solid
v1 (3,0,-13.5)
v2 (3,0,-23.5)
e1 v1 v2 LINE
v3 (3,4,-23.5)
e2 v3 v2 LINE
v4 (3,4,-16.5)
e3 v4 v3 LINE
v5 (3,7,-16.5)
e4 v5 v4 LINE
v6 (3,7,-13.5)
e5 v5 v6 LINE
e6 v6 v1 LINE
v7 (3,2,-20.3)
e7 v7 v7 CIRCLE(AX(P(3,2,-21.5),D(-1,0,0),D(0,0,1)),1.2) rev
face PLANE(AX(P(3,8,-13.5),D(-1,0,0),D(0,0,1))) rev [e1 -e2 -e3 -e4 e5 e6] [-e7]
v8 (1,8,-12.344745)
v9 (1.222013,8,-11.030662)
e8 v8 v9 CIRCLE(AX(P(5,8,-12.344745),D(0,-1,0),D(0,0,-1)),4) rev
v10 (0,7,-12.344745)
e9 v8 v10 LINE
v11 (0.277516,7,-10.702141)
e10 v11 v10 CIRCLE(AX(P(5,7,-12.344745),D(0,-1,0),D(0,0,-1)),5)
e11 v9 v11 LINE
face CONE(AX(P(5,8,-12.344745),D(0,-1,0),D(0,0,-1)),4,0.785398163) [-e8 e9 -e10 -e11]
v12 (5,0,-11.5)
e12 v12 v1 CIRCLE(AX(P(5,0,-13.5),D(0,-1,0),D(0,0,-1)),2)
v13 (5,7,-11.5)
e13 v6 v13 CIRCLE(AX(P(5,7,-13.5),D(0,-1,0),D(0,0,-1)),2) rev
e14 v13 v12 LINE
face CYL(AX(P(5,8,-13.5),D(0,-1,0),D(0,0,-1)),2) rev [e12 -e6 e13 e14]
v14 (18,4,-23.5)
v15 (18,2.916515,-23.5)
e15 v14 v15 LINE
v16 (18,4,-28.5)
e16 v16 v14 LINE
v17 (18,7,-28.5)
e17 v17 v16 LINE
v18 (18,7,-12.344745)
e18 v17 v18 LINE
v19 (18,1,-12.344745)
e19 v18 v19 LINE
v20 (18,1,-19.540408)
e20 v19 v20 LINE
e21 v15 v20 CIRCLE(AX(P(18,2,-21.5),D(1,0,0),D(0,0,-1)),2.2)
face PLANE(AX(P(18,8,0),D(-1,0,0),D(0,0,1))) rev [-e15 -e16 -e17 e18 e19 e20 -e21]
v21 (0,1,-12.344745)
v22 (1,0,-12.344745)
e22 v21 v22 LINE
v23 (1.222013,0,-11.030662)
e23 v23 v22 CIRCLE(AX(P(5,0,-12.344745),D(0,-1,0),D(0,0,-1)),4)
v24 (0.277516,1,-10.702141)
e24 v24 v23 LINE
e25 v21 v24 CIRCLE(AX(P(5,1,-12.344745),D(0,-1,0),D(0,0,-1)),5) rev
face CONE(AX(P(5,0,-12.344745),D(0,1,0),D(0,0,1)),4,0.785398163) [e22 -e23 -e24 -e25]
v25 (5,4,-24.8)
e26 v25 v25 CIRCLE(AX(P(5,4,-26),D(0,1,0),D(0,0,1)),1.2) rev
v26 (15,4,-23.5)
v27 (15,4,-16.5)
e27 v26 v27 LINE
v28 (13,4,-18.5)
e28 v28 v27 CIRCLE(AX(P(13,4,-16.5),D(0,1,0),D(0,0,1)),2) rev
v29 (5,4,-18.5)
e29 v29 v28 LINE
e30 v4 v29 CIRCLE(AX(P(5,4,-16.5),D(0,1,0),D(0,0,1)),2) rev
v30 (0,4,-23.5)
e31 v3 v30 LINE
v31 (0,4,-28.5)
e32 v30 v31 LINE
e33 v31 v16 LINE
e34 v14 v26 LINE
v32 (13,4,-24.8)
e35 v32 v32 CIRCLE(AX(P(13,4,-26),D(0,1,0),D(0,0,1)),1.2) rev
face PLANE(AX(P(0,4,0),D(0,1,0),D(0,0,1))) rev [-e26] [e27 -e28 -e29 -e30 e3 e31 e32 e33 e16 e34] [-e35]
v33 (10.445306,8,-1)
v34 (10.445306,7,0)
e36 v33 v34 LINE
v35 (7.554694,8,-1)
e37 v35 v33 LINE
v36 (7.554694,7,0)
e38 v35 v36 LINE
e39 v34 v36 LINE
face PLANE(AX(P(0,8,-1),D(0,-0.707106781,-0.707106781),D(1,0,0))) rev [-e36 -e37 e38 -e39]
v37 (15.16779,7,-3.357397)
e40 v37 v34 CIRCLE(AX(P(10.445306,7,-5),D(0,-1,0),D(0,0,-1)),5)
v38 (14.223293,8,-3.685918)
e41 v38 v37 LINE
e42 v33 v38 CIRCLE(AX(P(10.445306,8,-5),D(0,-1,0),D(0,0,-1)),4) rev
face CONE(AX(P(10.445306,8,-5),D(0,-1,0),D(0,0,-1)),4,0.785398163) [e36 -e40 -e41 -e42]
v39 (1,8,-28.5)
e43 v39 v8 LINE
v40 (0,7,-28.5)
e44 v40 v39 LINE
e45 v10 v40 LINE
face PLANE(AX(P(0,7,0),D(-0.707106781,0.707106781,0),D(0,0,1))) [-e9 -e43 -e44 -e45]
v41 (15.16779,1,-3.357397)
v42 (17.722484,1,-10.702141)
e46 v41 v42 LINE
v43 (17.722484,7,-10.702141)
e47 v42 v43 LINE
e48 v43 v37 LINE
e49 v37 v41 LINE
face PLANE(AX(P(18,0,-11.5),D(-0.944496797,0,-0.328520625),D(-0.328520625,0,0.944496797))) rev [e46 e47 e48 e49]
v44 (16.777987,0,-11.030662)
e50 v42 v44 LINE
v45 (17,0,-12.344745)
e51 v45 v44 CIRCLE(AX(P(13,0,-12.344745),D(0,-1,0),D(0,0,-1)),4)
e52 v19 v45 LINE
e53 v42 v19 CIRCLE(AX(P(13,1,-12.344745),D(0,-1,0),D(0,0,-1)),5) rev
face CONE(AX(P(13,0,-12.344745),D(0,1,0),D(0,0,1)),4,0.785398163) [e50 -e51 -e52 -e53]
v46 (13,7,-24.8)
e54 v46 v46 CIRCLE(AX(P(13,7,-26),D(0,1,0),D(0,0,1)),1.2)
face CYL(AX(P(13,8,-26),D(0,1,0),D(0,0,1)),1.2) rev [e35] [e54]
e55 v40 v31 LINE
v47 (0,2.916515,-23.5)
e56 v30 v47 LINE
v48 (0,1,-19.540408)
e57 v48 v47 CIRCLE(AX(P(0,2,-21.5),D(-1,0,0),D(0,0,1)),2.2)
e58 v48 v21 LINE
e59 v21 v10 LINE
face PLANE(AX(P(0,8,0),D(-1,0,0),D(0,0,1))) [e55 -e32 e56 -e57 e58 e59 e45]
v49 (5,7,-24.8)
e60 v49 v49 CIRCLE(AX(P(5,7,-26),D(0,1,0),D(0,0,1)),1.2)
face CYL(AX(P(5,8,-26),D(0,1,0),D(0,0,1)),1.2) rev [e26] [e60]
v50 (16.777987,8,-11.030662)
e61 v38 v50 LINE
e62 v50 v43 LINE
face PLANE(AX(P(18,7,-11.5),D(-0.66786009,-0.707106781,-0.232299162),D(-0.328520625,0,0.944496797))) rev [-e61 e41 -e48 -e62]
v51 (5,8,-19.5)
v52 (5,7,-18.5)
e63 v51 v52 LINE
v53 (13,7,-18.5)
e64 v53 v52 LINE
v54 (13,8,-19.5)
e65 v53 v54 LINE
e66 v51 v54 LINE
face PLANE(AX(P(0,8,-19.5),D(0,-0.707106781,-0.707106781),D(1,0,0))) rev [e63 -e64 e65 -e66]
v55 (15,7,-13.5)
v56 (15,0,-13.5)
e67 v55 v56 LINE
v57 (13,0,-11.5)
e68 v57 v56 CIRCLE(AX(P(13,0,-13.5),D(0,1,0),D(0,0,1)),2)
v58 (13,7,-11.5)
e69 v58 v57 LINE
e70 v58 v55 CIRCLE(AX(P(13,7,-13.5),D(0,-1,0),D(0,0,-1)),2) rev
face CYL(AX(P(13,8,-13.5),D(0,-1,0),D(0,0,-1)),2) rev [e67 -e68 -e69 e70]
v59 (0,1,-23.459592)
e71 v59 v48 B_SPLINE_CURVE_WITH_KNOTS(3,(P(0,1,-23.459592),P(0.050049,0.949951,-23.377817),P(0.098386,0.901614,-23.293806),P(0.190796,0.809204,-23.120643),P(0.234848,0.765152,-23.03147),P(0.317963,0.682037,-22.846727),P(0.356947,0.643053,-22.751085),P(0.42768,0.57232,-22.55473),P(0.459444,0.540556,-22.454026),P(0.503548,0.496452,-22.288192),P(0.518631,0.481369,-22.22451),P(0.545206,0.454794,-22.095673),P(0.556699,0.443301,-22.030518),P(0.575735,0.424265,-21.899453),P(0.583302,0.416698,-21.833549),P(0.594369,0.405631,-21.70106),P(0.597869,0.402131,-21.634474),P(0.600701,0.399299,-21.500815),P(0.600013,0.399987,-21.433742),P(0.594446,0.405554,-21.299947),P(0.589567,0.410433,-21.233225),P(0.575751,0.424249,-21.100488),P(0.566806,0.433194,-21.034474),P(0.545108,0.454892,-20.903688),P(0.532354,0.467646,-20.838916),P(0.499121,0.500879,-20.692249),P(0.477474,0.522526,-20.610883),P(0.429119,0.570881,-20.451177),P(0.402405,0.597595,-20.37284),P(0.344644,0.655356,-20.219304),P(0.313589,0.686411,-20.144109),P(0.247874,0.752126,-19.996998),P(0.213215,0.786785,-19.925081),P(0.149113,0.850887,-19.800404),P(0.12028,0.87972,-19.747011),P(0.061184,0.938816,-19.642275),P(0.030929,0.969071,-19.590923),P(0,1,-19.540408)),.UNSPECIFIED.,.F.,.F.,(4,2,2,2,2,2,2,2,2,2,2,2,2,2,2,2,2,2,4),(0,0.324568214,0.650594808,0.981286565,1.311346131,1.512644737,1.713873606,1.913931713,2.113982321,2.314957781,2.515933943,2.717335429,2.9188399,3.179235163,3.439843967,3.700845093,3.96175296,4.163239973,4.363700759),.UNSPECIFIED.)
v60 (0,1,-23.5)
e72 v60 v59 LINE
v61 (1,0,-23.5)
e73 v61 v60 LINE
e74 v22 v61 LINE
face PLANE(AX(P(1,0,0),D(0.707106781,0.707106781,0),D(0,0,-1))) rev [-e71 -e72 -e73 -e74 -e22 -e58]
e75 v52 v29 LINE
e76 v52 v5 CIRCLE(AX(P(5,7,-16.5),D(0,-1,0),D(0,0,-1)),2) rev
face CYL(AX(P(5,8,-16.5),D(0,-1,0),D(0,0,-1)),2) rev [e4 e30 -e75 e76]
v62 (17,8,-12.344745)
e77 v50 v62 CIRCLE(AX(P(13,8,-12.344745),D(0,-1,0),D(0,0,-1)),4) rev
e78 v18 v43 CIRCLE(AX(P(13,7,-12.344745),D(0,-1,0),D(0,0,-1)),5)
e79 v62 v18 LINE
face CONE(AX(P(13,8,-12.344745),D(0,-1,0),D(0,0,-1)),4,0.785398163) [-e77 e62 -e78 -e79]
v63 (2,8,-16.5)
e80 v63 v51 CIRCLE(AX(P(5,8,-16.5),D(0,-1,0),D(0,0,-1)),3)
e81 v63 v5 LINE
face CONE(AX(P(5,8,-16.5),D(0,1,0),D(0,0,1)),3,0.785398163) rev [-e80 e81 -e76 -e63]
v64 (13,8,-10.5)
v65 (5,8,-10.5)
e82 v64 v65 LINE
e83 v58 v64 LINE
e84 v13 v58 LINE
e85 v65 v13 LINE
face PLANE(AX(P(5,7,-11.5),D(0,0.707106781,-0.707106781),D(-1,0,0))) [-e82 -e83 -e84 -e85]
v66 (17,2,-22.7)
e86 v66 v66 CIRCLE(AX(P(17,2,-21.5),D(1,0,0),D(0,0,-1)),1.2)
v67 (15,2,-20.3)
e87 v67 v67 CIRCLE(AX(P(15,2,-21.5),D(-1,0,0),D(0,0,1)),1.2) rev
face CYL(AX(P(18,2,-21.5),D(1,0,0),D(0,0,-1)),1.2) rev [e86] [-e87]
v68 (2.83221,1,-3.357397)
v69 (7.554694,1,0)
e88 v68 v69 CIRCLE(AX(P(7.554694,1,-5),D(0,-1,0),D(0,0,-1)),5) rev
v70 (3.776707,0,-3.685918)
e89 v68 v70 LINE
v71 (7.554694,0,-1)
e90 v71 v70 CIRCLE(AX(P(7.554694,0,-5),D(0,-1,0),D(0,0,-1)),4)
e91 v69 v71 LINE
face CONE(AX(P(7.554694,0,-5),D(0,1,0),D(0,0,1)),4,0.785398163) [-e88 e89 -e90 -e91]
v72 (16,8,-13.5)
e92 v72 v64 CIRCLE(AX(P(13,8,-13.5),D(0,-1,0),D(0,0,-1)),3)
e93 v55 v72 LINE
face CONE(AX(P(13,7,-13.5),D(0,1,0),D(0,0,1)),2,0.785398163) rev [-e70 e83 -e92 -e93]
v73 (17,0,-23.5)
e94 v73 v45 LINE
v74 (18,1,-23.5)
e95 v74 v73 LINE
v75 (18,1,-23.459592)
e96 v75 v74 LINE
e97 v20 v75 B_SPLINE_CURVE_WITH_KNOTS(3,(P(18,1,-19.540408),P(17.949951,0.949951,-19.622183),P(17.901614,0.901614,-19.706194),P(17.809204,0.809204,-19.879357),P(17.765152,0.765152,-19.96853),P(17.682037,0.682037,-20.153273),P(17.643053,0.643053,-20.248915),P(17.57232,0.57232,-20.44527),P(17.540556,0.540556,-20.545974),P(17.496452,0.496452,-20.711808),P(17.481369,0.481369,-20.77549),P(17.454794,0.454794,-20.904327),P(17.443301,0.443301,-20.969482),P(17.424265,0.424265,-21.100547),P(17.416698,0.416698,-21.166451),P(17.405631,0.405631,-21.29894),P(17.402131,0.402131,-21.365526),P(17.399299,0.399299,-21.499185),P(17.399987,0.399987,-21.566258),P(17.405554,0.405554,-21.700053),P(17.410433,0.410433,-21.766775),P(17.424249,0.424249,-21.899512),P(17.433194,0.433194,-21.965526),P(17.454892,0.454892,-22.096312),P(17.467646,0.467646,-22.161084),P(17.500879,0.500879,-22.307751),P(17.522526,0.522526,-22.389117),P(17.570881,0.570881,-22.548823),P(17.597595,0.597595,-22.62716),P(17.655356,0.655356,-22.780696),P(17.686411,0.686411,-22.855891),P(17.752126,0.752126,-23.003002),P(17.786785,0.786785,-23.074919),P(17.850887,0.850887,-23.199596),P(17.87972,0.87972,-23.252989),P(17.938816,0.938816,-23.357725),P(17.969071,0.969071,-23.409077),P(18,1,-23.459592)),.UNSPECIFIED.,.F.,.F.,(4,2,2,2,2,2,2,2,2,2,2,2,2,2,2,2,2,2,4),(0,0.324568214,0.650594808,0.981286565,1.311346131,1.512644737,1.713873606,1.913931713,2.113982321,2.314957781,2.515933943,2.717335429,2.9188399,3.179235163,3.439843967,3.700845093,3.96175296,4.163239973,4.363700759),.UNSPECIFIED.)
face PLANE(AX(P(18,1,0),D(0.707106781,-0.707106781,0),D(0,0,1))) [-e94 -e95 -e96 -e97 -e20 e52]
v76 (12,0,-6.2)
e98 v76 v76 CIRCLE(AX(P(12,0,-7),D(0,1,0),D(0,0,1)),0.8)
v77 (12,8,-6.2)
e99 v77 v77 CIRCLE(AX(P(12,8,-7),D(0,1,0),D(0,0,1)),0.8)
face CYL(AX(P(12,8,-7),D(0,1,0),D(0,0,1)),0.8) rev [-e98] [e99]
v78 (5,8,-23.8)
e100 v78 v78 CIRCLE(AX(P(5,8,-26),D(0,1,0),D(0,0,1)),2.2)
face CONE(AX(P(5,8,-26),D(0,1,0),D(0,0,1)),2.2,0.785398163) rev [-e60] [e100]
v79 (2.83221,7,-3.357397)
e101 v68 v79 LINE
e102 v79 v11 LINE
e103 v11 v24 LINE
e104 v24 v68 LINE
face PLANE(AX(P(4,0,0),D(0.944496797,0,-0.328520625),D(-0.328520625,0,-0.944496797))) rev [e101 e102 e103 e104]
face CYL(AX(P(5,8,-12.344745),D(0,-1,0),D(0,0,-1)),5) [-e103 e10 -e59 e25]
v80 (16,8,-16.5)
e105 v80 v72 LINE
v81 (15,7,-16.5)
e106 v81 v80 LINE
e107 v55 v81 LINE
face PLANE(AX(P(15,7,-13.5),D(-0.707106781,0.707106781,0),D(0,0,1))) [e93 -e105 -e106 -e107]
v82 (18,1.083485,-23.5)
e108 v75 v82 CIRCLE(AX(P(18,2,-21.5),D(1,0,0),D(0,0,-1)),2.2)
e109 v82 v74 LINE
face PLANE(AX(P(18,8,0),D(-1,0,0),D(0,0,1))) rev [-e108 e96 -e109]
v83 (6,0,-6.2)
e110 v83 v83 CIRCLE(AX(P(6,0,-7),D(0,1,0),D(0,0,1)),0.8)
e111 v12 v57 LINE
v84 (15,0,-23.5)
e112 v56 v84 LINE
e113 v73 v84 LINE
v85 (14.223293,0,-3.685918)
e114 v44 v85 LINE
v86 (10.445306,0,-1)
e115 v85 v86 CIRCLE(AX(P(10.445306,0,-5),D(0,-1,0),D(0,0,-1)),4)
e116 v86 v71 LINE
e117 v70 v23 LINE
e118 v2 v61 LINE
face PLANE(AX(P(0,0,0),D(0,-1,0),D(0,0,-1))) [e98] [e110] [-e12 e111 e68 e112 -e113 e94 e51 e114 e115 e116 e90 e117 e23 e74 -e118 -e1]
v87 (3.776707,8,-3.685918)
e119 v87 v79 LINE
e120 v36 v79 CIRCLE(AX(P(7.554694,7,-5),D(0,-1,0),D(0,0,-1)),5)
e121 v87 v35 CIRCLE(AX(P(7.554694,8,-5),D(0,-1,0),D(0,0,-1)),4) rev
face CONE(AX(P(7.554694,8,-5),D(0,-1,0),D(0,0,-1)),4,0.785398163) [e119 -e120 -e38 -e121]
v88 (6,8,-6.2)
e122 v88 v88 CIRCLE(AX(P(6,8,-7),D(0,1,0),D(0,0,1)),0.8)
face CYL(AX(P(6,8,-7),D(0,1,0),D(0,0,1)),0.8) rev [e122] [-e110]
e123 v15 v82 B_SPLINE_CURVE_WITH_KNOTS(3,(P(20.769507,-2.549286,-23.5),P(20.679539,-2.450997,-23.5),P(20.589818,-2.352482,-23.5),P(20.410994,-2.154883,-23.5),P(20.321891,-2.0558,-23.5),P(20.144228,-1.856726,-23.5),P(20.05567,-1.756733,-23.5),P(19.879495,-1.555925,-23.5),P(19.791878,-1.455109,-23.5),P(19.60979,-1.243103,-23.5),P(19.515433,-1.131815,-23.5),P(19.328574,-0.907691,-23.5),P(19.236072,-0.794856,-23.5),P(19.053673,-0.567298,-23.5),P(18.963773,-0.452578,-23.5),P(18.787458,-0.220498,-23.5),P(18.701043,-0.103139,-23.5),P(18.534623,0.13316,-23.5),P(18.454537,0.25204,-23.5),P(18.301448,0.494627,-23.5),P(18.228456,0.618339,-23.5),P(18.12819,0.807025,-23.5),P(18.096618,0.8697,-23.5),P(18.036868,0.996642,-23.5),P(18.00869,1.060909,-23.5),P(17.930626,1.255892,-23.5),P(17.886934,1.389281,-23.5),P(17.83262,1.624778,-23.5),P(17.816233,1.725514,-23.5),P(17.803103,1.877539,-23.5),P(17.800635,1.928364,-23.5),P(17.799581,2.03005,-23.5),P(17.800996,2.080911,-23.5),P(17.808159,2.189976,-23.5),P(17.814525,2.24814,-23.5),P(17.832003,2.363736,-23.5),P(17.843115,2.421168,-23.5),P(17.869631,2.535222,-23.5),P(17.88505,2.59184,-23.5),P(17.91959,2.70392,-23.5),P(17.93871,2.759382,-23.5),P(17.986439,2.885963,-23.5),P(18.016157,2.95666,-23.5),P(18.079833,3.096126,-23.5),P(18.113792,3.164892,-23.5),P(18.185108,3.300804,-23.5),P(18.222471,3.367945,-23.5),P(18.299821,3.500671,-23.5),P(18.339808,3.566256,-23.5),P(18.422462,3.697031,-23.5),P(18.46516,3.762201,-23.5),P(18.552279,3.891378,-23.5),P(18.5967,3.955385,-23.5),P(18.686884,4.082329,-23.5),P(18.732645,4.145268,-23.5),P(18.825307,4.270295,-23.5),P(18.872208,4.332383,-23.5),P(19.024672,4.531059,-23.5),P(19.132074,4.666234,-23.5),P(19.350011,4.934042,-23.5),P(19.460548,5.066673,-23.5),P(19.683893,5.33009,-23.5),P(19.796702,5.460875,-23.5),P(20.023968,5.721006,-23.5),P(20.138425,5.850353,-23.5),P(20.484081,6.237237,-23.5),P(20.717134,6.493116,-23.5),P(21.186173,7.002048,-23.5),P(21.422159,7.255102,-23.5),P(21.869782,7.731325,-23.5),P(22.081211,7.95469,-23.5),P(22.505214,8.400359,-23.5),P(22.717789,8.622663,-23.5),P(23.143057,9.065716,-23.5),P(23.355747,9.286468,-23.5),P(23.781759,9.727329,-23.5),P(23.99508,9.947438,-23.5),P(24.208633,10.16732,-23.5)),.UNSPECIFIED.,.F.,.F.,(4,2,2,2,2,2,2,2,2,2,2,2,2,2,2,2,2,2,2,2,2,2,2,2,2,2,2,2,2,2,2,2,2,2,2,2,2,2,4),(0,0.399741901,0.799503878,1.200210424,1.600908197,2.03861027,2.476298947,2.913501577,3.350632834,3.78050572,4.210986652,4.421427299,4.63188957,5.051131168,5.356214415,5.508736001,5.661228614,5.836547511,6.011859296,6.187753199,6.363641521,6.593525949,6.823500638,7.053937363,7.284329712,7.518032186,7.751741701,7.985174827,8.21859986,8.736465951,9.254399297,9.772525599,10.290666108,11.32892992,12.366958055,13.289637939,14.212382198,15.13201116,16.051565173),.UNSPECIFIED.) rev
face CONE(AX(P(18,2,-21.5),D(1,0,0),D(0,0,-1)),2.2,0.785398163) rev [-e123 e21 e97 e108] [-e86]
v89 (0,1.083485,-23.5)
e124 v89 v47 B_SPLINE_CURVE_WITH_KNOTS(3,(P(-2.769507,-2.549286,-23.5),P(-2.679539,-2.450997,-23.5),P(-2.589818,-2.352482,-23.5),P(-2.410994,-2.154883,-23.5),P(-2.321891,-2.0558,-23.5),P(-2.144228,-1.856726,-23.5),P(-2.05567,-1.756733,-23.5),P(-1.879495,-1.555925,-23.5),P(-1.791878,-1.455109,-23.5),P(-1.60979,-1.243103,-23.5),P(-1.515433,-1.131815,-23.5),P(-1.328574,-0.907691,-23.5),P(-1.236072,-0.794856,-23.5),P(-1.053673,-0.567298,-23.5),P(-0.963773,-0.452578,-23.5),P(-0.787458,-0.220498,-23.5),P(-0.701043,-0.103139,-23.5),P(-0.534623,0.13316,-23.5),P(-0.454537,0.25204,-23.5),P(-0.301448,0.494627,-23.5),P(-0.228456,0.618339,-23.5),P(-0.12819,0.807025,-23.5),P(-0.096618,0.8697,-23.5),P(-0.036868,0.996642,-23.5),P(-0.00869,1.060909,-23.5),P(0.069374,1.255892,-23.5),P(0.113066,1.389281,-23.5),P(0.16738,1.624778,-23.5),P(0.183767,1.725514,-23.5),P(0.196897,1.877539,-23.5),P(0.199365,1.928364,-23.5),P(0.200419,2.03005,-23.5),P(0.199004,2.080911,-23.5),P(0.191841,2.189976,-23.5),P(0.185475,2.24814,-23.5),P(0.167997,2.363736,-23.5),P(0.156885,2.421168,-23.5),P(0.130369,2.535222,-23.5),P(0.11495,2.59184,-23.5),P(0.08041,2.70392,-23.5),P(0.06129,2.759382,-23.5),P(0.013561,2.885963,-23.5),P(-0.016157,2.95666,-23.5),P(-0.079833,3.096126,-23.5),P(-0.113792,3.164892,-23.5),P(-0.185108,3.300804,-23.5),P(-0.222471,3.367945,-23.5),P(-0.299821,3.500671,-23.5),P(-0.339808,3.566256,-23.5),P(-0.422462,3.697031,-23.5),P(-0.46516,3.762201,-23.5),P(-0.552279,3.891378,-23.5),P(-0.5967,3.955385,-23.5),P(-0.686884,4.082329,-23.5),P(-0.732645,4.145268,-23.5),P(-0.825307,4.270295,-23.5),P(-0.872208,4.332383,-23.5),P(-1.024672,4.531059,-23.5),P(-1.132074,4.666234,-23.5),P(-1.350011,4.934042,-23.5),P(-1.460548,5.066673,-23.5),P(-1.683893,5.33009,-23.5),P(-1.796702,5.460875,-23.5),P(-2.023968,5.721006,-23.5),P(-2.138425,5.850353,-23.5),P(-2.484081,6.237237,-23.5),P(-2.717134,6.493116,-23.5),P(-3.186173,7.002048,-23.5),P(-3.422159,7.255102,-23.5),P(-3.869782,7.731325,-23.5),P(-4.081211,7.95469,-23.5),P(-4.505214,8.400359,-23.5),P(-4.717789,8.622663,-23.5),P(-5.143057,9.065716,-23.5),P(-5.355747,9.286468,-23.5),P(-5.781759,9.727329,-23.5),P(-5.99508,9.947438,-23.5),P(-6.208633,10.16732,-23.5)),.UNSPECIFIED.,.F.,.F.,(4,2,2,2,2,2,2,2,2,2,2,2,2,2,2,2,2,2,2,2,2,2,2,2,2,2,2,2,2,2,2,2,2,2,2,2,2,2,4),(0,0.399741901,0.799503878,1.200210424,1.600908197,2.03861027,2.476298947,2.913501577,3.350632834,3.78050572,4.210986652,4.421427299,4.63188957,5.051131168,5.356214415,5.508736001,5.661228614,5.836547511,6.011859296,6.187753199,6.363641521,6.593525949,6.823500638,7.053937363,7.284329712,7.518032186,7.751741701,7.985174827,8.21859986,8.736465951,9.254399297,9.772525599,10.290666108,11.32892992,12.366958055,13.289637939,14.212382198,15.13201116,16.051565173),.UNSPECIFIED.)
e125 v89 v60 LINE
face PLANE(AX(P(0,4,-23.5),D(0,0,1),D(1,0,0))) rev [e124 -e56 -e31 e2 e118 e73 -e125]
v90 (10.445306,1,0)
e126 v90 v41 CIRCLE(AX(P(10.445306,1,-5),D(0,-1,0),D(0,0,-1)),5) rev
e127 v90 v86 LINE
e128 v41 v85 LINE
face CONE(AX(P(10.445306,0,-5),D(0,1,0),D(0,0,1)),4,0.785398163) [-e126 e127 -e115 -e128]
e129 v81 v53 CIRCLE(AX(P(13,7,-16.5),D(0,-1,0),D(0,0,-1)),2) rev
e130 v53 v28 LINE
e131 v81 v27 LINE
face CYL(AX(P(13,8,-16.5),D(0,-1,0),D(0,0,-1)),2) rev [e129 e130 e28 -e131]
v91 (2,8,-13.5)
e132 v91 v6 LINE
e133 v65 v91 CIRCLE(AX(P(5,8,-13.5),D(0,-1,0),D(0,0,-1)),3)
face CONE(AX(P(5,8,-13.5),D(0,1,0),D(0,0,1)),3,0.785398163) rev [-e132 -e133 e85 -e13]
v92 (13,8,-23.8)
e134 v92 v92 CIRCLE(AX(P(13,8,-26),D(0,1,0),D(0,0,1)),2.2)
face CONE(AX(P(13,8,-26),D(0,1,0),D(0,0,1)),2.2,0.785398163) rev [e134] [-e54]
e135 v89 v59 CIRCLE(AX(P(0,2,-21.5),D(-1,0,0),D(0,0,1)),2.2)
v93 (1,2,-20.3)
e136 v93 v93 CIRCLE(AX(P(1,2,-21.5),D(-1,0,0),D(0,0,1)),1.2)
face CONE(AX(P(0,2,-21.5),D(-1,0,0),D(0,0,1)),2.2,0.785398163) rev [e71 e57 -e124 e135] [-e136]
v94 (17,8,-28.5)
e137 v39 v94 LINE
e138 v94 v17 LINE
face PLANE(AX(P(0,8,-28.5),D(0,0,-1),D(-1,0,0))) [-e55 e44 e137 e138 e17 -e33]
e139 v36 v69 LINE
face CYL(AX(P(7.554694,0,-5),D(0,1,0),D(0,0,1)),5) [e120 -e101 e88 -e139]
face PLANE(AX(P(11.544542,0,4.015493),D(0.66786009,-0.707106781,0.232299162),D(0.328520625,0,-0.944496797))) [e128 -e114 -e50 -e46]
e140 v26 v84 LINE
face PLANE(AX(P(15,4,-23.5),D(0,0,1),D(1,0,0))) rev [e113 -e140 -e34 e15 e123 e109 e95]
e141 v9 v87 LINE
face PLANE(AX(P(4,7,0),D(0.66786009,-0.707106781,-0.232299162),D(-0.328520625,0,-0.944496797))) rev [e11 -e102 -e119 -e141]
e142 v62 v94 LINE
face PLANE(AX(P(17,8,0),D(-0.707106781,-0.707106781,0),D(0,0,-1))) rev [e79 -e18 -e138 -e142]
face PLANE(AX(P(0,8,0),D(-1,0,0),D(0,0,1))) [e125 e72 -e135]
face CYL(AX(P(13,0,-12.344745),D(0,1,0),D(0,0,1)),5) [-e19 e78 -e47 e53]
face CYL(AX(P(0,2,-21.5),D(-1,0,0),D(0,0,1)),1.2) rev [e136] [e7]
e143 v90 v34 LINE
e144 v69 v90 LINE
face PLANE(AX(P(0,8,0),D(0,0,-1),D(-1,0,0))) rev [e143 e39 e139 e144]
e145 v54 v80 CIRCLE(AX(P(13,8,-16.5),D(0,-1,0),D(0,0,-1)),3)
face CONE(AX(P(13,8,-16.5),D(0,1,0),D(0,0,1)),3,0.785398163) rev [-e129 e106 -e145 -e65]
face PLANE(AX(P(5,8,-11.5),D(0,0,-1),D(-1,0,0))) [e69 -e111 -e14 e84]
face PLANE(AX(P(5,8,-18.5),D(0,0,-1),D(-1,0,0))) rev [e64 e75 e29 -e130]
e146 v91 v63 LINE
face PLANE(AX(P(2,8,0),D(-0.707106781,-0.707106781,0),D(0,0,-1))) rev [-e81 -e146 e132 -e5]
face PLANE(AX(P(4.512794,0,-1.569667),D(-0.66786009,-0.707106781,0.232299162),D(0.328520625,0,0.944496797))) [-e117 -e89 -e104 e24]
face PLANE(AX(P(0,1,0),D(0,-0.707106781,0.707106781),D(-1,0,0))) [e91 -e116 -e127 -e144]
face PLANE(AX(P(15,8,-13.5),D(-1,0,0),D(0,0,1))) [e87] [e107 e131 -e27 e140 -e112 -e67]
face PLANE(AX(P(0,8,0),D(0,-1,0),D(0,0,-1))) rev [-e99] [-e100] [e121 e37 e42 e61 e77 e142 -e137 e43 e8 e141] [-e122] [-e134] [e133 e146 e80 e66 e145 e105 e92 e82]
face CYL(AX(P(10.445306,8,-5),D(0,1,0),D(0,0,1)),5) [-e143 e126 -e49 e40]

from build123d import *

# Parameters (mm, degrees)
ESBO_O1_W                                            = 18
ESBO_O1_H                                            = 28.5
RESSALTO_EXTRUS_O1_DEPTH                             = 8
ESCAREADO_PARA_PARAFUSO_COM_CABE_A_ESCAR_D           = 2.4
ESCAREADO_PARA_PARAFUSO_COM_CABE_A_ESCAR_CSINK_D     = 4.4
ESCAREADO_PARA_PARAFUSO_COM_CABE_A_ESCAR_CSINK_ANGLE = 90
CORTE_EXTRUS_O1_DEPTH                                = 4
ESCAREADO_PARA_PARAFUSO_COM_CABE_A_E_3_D             = 2.4
ESCAREADO_PARA_PARAFUSO_COM_CABE_A_E_3_CSINK_D       = 4.4
ESCAREADO_PARA_PARAFUSO_COM_CABE_A_E_3_CSINK_ANGLE   = 90
CORTE_EXTRUS_O2_DEPTH                                = 35.644624403
FILETE1_R                                            = 5
CHANFRO1_SIZE                                        = 1
CHANFRO2_SIZE                                        = 1
BROCA_DE_ROSQUEAR_PARA_TARRAXA_DE_M21_D              = 1.6


# Read off the part's stored shape, not the designer's step: Escareado para parafuso com cabeça escareada chata de M21
with BuildPart() as part:
    # Esboço1 → Ressalto-extrusão1 (new body)
    with BuildSketch(Plane(origin=(0, 0, 0), x_dir=(1, 0, 0), z_dir=(0, 1, 0))):
        with Locations((9, 14.25)):
            Rectangle(ESBO_O1_W, ESBO_O1_H)
        with BuildLine():
            Line((5, 11.5), (13, 11.5))
            ThreePointArc((13, 11.5), (14.414213562, 12.085786438), (15, 13.5))
            Line((15, 13.5), (15, 16.5))
            ThreePointArc((15, 16.5), (14.414213562, 17.914213562), (13, 18.5))
            Line((13, 18.5), (5, 18.5))
            ThreePointArc((5, 18.5), (3.585786438, 17.914213562), (3, 16.5))
            Line((3, 16.5), (3, 13.5))
            ThreePointArc((3, 13.5), (3.585786438, 12.085786438), (5, 11.5))
        make_face(mode=Mode.SUBTRACT)
    extrude(amount=RESSALTO_EXTRUS_O1_DEPTH)

    # Escareado para parafuso com cabe_a escar (through all)
    with Locations(Plane(origin=(5, 8, -26), x_dir=(0, 0, 1), z_dir=(0, 1, 0))):
        with Locations((0, 0), (0, 8)):
            CounterSinkHole(ESCAREADO_PARA_PARAFUSO_COM_CABE_A_ESCAR_D / 2, ESCAREADO_PARA_PARAFUSO_COM_CABE_A_ESCAR_CSINK_D / 2, counter_sink_angle=ESCAREADO_PARA_PARAFUSO_COM_CABE_A_ESCAR_CSINK_ANGLE)

    # Esboço10 → Corte-extrusão1 (cut)
    with BuildSketch(Plane.XZ):
        Polygon((0, -28.5), (18, -28.5), (18, -23.5), (15, -23.5), (15, -15), (3, -15), (3, -23.5), (0, -23.5), align=None)
    extrude(amount=-CORTE_EXTRUS_O1_DEPTH, mode=Mode.SUBTRACT)

    # Escareado para parafuso com cabe_a e 2 o → Escareado para parafuso com cabe_a e 2 (revolve, cut)
    with BuildSketch(Plane(origin=(0, 2, -21.5), x_dir=(0, 1, 0), z_dir=(0, 0, -1))):
        Polygon((2.2, 18), (0, 18), (0, 15), (1.2, 15), (1.2, 17), align=None)
    revolve(axis=Axis((0, 2, -21.5), (1, 0, 0)), mode=Mode.SUBTRACT)

    # Escareado para parafuso com cabe_a e 3 (through all)
    with Locations(Plane(origin=(0, 2, -21.5), x_dir=(0, 0, -1), z_dir=(-1, 0, 0))):
        with Locations((0, 0)):
            CounterSinkHole(ESCAREADO_PARA_PARAFUSO_COM_CABE_A_E_3_D / 2, ESCAREADO_PARA_PARAFUSO_COM_CABE_A_E_3_CSINK_D / 2, counter_sink_angle=ESCAREADO_PARA_PARAFUSO_COM_CABE_A_E_3_CSINK_ANGLE)

    # Esboço15 → Corte-extrusão2 (cut, through all)
    with BuildSketch(Plane(origin=(0, 8, 0), x_dir=(1, 0, 0), z_dir=(0, 1, 0))):
        Polygon((0, 0), (4, 0), (0, 11.5), align=None)
        Polygon((18, 0), (18, 11.5), (14, 0), align=None)
    extrude(amount=-CORTE_EXTRUS_O2_DEPTH, mode=Mode.SUBTRACT)

    # Filete1
    filete1_edges = [part.edges().sort_by_distance(p)[0] for p in [
        (0, 4, -11.5),
        (4, 4, 0),
        (14, 4, 0),
        (18, 4, -11.5),
    ]]
    fillet(filete1_edges, radius=FILETE1_R)

    # Chanfro1
    chanfro1_edges = [part.edges().sort_by_distance(p)[0] for p in [
        (16.445137101, 8, -7.029769164),
        (0, 8, -20.422372289),
        (1.554862899, 8, -7.029769164),
        (9, 8, 0),
        (18, 8, -20.422372289),
        (13.342458661, 8, -0.924891681),
        (0.069867146, 8, -11.511803979),
        (4.657541339, 8, -0.924891681),
        (17.930132854, 8, -11.511803979),
        (3.585786438, 8, -12.085786438),
        (14.414213562, 8, -17.914213562),
        (9, 8, -18.5),
        (3.585786438, 8, -17.914213562),
        (3, 8, -15),
        (9, 8, -11.5),
        (14.414213562, 8, -12.085786438),
        (15, 8, -15),
    ]]
    chamfer(chanfro1_edges, length=CHANFRO1_SIZE)

    # Chanfro2
    # the kernel refuses this chamfer: 1 mm, written as the material it takes off along each edge
    with BuildSketch(Plane(origin=(0, 0, -26.071682988), x_dir=(0.9996219169112968, -0.027495876610586372, 0), z_dir=(0, 0, 1)), Plane(origin=(18, 0, -19.844832151), x_dir=(-0.9996219169112968, -0.02749587661058639, 0), z_dir=(0, 0, -1))) as chanfro2_piece_1:
        Polygon((CHANFRO2_SIZE * 0.999621916911, CHANFRO2_SIZE * 0.0274958766106), (-CHANFRO2_SIZE * 0.0274958766106, CHANFRO2_SIZE * 0.999621916911), (0, 0), align=None)
    extrude(amount=6.226850837, mode=Mode.SUBTRACT)
    with BuildSketch(Plane(origin=(17.722483984, 0, -10.702141453), x_dir=(-0.94413969843999, -0.02749587661058639, -0.32839641684869236), z_dir=(-0.3285206249412729, 0, 0.944496796706159)), Plane(origin=(2.832209783, 0, -3.357396875), x_dir=(0.9441396984399901, -0.02749587661058552, -0.32839641684869225), z_dir=(-0.32852062494127277, 0, -0.9444967967061592))) as chanfro2_piece_2:
        Polygon((CHANFRO2_SIZE * 0.999621916911, -CHANFRO2_SIZE * 0.0274958766106), (-CHANFRO2_SIZE * 0.0274958766106, -CHANFRO2_SIZE * 0.999621916911), (0, 0), align=None)
    extrude(amount=7.776357318, mode=Mode.SUBTRACT)
    with BuildSketch(Plane(origin=(18, 0, -12.344744577), x_dir=(-0.9996219169112968, -0.02749587661058639, 0), z_dir=(0, 0, -1)), Plane(origin=(0, 0, -23.155167849), x_dir=(0.9996219169112968, -0.027495876610586372, 0), z_dir=(0, 0, 1))) as chanfro2_piece_3:
        Polygon((CHANFRO2_SIZE * 0.999621916911, CHANFRO2_SIZE * 0.0274958766106), (-CHANFRO2_SIZE * 0.0274958766106, CHANFRO2_SIZE * 0.999621916911), (0, 0), align=None)
    extrude(amount=10.810423272, mode=Mode.SUBTRACT)
    with BuildSketch(Plane(origin=(7.554693766, 0, 0), x_dir=(0, 0.9996219169112968, 0.027495876610586372), z_dir=(1, 0, 0))) as chanfro2_piece_4:
        Polygon((CHANFRO2_SIZE * 0.999621916911, -CHANFRO2_SIZE * 0.0274958766106), (-CHANFRO2_SIZE * 0.0274958766106, -CHANFRO2_SIZE * 0.999621916911), (0, 0), align=None)
    extrude(amount=2.890612468, mode=Mode.SUBTRACT)
    with BuildSketch(Plane(origin=(10.445306234, 0, -5), x_dir=(0, 0, 1), z_dir=(-1, 0, 0))) as chanfro2_piece_5:
        Polygon((5 - CHANFRO2_SIZE, 0), (5, CHANFRO2_SIZE), (5, 0), align=None)
    revolve(axis=Axis((10.445306234, 0, -5), (0, 1, 0)), revolution_arc=70.820991974, mode=Mode.SUBTRACT)
    with BuildSketch(Plane(origin=(5, 0, -12.344744577), x_dir=(-0.944496796706159, 0, 0.32852062494127277), z_dir=(0.32852062494127277, 0, 0.944496796706159))) as chanfro2_piece_6:
        Polygon((5 - CHANFRO2_SIZE, 0), (5, -CHANFRO2_SIZE), (5, 0), align=None)
    revolve(axis=Axis((5, 0, -12.344744577), (0, -1, 0)), revolution_arc=19.179008026, mode=Mode.SUBTRACT)
    with BuildSketch(Plane(origin=(7.554693766, 0, -5), x_dir=(0, 0, 1), z_dir=(1, 0, 0))) as chanfro2_piece_7:
        Polygon((5, -CHANFRO2_SIZE), (5 - CHANFRO2_SIZE, 0), (5, 0), align=None)
    revolve(axis=Axis((7.554693766, 0, -5), (0, -1, 0)), revolution_arc=70.820991974, mode=Mode.SUBTRACT)
    with BuildSketch(Plane(origin=(13, 0, -12.344744577), x_dir=(0.9444967967061589, 0, 0.3285206249412729), z_dir=(-0.3285206249412729, 0, 0.9444967967061589))) as chanfro2_piece_8:
        Polygon((5 - CHANFRO2_SIZE, 0), (5, CHANFRO2_SIZE), (5, 0), align=None)
    revolve(axis=Axis((13, 0, -12.344744577), (0, 1, 0)), revolution_arc=19.179008026, mode=Mode.SUBTRACT)

    # Broca de rosquear para tarraxa de M21 (through all)
    with Locations(Plane(origin=(6, 8, -7), x_dir=(0, 0, 1), z_dir=(0, 1, 0))):
        with Locations((0, 0), (0, 6)):
            Hole(BROCA_DE_ROSQUEAR_PARA_TARRAXA_DE_M21_D / 2)


solid = part.part
